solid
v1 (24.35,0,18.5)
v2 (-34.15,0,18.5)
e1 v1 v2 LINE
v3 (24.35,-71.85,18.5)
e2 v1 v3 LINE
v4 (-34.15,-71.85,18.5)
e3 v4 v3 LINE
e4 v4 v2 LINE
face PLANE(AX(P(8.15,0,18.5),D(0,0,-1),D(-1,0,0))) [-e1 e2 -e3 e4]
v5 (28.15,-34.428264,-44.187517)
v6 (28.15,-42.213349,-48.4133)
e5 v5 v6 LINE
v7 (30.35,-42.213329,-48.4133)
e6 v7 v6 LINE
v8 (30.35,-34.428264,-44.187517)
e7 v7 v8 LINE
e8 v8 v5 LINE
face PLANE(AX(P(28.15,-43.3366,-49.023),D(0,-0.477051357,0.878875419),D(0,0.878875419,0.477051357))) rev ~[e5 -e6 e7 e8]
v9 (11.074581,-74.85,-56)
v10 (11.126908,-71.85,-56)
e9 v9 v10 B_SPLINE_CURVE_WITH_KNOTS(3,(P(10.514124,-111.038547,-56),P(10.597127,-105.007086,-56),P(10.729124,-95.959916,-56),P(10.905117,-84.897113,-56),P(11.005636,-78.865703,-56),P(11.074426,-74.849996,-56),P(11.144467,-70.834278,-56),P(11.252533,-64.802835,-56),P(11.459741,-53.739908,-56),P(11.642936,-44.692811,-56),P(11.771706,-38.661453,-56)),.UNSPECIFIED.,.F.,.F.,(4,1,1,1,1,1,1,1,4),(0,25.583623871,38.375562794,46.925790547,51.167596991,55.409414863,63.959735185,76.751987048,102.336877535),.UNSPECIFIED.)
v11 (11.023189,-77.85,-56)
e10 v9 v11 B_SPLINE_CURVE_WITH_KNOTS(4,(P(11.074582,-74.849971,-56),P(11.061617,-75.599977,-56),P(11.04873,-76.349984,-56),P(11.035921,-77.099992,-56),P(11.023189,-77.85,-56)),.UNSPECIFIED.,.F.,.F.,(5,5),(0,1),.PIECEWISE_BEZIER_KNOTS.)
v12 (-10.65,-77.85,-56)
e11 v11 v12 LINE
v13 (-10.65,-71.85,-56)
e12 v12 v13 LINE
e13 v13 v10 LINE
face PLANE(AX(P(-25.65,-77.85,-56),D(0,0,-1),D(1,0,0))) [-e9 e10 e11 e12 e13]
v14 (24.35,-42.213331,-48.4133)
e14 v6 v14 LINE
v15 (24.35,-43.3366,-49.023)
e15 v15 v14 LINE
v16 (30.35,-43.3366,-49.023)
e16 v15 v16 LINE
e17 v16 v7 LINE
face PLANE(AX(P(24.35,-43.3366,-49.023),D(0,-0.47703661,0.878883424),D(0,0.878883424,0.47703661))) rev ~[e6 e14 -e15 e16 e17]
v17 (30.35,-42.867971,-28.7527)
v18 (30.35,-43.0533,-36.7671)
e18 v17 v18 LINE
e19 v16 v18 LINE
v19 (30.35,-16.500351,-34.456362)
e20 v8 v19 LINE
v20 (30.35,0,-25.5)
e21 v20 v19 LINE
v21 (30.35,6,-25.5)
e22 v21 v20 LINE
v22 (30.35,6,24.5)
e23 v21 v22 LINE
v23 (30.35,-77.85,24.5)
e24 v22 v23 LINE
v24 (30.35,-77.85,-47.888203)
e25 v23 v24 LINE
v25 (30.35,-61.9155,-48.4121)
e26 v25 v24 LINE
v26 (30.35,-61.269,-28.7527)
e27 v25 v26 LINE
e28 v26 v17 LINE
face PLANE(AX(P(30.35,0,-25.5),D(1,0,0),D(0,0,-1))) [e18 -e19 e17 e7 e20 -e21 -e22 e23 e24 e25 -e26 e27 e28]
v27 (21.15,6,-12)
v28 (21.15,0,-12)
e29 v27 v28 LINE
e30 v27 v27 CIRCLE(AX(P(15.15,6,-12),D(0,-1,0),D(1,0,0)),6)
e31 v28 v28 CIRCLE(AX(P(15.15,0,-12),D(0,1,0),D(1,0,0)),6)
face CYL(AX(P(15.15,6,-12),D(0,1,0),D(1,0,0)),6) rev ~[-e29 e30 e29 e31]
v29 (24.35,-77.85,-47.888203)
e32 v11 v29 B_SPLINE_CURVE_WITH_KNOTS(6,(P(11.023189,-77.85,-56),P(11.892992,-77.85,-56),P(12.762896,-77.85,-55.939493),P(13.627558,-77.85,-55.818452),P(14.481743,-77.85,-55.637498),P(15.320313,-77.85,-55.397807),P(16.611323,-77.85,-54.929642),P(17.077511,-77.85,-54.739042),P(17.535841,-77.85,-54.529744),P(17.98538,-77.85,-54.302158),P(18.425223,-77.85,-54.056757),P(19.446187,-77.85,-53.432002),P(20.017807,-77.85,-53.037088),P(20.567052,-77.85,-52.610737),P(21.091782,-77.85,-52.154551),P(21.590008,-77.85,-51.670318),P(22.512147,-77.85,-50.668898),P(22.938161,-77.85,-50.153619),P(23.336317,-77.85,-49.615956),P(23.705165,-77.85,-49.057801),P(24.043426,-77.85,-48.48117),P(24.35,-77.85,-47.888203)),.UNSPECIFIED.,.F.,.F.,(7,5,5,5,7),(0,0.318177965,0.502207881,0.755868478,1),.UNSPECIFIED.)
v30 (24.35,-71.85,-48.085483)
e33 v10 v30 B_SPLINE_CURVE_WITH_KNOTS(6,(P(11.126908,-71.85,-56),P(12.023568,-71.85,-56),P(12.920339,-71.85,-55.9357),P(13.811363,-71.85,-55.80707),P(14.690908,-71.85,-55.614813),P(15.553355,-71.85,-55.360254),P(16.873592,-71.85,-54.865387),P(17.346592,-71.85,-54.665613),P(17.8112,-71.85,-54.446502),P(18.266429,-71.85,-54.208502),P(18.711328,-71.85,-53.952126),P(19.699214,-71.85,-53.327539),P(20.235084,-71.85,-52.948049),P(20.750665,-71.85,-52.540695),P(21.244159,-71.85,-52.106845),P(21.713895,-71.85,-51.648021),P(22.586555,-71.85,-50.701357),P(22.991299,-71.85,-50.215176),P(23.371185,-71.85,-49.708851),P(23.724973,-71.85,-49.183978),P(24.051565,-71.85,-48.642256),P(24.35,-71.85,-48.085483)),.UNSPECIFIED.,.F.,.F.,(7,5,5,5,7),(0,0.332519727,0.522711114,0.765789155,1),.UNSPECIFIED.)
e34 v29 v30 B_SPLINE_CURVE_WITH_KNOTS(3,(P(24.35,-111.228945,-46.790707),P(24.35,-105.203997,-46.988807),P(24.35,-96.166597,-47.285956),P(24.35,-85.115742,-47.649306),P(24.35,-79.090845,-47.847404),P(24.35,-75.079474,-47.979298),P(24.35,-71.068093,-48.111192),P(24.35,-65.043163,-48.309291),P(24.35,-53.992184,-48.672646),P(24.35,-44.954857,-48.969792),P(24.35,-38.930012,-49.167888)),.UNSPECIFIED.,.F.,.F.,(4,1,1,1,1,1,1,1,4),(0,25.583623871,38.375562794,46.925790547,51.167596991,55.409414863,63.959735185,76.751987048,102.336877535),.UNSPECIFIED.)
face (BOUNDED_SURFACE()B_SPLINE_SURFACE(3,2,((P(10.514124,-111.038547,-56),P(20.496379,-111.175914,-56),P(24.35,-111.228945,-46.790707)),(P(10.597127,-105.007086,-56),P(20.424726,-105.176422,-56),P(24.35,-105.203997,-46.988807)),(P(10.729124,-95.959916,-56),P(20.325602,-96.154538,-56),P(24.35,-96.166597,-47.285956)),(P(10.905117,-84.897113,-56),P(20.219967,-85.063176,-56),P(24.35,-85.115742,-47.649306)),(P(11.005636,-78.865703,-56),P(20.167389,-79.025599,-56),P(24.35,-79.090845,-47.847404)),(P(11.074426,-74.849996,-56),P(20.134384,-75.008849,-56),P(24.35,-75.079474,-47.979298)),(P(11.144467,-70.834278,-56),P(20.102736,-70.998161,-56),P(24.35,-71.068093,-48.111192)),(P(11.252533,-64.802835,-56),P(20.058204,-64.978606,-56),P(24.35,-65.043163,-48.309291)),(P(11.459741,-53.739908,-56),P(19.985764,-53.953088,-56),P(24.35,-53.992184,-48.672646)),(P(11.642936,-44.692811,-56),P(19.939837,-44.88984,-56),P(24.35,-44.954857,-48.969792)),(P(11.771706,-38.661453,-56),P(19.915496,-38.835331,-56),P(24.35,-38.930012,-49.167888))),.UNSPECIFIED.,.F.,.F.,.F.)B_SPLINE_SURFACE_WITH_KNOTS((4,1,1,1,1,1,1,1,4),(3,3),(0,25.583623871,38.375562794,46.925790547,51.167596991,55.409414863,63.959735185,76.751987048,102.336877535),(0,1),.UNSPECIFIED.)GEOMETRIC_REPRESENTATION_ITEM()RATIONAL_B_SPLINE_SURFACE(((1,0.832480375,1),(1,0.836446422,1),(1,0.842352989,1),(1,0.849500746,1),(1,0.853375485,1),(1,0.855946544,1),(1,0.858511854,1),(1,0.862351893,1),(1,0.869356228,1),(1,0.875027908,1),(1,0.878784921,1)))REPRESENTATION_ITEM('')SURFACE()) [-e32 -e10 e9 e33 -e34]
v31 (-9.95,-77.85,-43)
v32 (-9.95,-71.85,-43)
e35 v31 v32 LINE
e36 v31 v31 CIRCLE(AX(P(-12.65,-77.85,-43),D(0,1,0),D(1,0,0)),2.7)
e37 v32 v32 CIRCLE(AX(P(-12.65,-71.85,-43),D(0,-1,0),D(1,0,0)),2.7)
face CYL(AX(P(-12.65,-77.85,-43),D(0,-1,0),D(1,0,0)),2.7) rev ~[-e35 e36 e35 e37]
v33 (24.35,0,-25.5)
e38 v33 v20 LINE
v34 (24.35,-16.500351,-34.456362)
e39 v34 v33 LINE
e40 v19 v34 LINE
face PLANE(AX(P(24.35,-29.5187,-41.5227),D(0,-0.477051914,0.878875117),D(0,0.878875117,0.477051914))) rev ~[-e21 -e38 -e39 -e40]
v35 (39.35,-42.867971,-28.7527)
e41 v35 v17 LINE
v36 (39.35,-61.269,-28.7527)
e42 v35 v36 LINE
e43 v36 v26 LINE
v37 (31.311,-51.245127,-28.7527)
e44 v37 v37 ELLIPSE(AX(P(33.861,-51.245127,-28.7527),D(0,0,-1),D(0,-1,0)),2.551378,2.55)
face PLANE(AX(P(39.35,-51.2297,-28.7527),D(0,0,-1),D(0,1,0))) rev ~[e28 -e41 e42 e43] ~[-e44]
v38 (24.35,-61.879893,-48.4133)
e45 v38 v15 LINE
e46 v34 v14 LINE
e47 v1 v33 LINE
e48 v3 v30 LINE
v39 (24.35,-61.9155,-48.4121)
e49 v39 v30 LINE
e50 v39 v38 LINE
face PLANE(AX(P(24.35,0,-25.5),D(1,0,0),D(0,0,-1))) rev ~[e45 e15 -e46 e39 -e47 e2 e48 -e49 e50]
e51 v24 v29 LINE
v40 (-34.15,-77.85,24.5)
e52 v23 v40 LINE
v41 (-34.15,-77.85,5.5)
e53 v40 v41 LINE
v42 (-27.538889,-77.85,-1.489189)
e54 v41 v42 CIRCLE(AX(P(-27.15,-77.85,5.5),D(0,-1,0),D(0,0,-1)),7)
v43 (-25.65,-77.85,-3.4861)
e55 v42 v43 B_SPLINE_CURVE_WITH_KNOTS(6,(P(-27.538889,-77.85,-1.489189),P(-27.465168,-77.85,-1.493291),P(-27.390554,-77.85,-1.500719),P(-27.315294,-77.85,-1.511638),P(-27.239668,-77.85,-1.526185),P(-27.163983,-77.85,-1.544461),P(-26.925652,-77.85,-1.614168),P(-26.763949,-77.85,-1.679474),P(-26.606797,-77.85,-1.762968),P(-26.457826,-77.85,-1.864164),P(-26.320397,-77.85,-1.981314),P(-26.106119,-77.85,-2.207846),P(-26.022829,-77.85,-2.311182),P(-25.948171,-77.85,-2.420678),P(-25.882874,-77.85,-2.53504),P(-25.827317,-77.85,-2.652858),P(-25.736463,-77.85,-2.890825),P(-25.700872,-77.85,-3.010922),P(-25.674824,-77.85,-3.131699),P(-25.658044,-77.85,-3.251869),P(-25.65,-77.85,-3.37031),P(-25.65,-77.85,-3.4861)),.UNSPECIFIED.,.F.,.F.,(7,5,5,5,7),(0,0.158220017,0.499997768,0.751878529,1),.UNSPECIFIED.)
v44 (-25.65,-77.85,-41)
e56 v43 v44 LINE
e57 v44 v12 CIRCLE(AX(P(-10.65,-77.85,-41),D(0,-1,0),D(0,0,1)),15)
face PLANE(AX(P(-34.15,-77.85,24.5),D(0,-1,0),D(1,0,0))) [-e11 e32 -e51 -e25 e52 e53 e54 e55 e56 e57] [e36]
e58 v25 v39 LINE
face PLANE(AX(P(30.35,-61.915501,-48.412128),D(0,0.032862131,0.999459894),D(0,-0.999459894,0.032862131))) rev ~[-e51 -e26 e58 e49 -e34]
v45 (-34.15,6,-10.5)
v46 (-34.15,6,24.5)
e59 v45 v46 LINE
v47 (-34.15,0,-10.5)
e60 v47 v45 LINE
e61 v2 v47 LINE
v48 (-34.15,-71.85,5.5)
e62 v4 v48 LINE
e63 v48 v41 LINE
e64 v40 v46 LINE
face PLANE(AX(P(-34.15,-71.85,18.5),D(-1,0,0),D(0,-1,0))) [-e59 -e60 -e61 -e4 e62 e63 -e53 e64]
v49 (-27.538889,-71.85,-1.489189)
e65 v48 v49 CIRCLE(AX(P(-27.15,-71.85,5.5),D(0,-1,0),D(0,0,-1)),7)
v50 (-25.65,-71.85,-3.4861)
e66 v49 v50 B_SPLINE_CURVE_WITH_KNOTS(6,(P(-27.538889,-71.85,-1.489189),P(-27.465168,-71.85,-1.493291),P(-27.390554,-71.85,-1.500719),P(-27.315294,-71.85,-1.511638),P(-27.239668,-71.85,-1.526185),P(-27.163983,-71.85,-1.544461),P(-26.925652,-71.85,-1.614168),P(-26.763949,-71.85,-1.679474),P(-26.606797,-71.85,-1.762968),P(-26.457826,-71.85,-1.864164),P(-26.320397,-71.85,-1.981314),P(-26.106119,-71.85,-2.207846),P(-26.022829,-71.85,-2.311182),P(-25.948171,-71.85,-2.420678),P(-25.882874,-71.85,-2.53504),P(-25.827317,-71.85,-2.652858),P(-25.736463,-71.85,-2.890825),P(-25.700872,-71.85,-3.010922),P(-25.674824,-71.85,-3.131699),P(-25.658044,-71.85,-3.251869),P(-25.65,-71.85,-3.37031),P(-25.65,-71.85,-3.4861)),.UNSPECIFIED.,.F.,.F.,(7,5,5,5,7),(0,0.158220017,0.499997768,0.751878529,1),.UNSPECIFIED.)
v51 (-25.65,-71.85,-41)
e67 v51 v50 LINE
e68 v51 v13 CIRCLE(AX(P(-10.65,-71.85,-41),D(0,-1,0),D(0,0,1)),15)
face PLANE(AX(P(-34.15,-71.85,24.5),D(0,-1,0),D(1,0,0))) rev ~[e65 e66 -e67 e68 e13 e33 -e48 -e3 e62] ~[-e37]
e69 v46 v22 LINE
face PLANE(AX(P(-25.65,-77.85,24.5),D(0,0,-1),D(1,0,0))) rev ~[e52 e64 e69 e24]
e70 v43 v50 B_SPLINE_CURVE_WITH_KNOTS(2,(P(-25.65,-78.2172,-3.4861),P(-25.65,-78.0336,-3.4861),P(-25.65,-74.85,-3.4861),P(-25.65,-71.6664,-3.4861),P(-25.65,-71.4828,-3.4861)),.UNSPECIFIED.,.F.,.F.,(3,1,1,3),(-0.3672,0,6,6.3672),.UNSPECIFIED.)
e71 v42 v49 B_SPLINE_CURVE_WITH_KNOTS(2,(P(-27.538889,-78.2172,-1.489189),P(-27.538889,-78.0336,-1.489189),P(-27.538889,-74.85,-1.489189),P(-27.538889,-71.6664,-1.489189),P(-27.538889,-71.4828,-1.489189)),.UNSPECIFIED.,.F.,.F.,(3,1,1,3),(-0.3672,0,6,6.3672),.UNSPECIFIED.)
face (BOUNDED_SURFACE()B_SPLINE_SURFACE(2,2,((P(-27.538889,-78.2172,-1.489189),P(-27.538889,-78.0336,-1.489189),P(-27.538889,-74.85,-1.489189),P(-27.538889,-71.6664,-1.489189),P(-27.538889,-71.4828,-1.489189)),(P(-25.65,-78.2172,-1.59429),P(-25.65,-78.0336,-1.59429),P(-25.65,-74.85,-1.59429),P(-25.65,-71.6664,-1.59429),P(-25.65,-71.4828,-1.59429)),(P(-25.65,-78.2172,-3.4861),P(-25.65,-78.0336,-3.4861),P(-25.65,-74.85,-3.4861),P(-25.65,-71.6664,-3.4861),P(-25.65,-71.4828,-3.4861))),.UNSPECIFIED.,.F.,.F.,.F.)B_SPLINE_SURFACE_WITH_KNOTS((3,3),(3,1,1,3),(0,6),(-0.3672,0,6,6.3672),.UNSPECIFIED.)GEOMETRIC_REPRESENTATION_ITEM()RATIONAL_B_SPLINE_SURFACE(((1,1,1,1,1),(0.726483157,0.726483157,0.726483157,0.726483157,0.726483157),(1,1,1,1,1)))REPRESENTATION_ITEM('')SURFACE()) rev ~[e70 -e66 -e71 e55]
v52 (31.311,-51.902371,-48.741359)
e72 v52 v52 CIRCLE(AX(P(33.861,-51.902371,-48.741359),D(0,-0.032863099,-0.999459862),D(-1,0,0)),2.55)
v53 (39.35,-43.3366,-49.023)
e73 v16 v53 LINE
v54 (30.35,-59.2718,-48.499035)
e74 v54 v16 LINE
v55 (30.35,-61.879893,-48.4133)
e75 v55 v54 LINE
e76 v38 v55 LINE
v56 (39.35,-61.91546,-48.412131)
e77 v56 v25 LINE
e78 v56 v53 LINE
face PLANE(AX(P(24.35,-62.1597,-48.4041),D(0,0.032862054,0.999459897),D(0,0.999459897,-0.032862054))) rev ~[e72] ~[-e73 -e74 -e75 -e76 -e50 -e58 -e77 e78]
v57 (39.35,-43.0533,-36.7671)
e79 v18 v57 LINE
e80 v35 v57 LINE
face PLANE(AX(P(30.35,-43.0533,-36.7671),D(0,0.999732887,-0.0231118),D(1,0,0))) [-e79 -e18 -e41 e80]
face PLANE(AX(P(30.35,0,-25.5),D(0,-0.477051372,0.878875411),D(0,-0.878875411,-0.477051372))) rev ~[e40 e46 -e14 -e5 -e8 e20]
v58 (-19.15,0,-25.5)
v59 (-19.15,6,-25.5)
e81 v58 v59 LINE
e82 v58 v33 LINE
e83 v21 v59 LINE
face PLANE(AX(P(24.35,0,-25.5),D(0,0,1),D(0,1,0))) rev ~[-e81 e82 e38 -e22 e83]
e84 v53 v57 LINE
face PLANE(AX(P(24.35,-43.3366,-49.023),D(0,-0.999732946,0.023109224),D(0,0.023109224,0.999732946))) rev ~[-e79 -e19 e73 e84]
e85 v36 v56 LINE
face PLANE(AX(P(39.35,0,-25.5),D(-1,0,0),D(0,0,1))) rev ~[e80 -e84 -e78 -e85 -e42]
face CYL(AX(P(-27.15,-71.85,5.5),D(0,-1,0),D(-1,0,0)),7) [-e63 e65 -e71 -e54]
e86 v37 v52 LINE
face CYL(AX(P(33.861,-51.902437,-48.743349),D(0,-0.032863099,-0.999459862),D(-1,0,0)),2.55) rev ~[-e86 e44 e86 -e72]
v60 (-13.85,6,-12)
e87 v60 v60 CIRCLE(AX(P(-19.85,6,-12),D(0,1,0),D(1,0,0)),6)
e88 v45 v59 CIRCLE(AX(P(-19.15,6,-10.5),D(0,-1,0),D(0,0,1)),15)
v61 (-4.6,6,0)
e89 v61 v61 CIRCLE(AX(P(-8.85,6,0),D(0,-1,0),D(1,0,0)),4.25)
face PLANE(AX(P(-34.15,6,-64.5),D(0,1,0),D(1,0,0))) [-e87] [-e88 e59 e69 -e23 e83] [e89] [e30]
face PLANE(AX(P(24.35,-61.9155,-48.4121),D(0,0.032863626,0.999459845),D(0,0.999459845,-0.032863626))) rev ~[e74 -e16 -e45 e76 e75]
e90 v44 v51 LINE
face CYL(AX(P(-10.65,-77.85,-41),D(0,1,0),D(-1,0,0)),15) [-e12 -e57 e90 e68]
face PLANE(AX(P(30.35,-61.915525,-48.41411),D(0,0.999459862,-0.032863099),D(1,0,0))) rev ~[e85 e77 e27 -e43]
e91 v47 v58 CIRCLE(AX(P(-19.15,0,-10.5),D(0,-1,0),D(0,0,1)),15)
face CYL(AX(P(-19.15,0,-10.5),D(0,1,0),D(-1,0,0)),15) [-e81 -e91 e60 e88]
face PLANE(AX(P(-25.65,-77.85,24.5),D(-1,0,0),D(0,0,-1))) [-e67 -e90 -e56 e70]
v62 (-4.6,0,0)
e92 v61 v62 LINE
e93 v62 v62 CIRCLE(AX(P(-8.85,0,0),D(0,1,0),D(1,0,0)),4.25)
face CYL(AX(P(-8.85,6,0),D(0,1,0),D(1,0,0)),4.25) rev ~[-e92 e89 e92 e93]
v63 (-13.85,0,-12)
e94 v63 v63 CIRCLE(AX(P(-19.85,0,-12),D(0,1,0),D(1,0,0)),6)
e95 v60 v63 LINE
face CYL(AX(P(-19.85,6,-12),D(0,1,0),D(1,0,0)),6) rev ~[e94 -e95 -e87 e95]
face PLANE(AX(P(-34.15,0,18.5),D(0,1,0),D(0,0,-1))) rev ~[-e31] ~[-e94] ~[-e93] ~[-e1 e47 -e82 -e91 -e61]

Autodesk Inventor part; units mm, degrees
ref_plane "YZ Plane" through (0, 0, 0) normal (1, 0, 0) x (0, 1, 0)
ref_plane "XZ Plane" through (0, 0, 0) normal (0, 1, 0) x (-1, 0, 0)
ref_plane "XY Plane" through (0, 0, 0) normal (0, 0, 1) x (1, 0, 0)
sketch "Sketch1" plane through (0, 0, 0) normal (0, 1, 0) x (-1, 0, 0)
  line L0 (0, -25.5) -> (-34.15, -25.5)
  line L1 (-34.15, -25.5) -> (-34.15, 0)
  line L2 (-34.15, 0) -> (-34.15, 25.5)
  line L3 (-34.15, 25.5) -> (0, 25.5)
  line L4 (0, 25.5) -> (34.15, 25.5)
  line L5 (34.15, 25.5) -> (34.15, 0)
  line L6 (34.15, 0) -> (34.15, -25.5)
  line L7 (34.15, -25.5) -> (0, -25.5)
  point P0 (0, 0)
extrude "Extrusion1" add sketch "Sketch1" along normal blind 7
sketch "Sketch4" plane through (-34.15, 0, -25.5) normal (-1, 0, 0) x (0, 0, 1)
  line L0 (51, 0) -> (51, -78.85)
  line L1 (51, -78.85) -> (-39, -78.85)
  line L2 (-39, -78.85) -> (-39, -71.85)
  line L3 (0, 0) -> (-39, -71.85)
  line L4 (0, 0) -> (51, 0)
  point P0 (25.5, 0)
  dimension "d10" = 90
  dimension "d11" = 7
extrude "Extrusion2" add sketch "Sketch4" against normal blind 7
sketch "Sketch7" plane through (-27.15, 0, -25.5) normal (1, 0, 0) x (0, 0, -1)
  line L0 (-51, -78.85) -> (39, -78.85) projected
  line L1 (-51, -78.85) -> (39, -78.85)
  line L2 (39, -78.85) -> (39, -71.85) projected
  line L3 (39, -78.85) -> (39, -71.85)
  line L4 (39, -71.85) -> (-51, -71.85)
  line L5 (-51, 0) -> (-51, -78.85) projected
  line L6 (-51, -78.85) -> (-51, -71.85)
  point P0 (-25.5, 0)
sketch "Sketch8" plane through (0, 0, 0) normal (0, -1, 0) x (1, 0, 0)
  circle A0 centre (8.15, 0) radius 5 projected
  line L0 (8.15, 18.5) -> (34.15, 18.5)
  line L1 (34.15, 25.5) -> (34.15, -25.5) projected
  line L2 (8.15, 25.5) -> (34.15, 25.5)
  line L3 (8.15, 25.5) -> (-27.15, 25.5)
  line L4 (-27.15, 25.5) -> (-27.15, -25.5) projected
  line L5 (8.15, 18.5) -> (-27.15, 18.5)
  line L6 (34.15, 25.5) -> (34.15, 18.5)
  line L7 (-27.15, 25.5) -> (-27.15, 18.5)
  point P0 (0, 0)
extrude "Extrusion6" add sketch "Sketch7" along normal blind 58.5
extrude "Extrusion7" add sketch "Sketch8" along normal blind 78.75 contours L5 L4 L3 L2 L1 L0
sketch "Sketch9" plane through (31.35, 0, -25.5) normal (1, 0, 0) x (0, 0, -1)
  line L0 (-51, -78.75) -> (-51, 7) projected
  line L1 (-44, 0) -> (-44, -71.85) projected
  line L2 (-51, -78.75) -> (-44, -78.75)
  line L3 (-44, -78.75) -> (-44, -71.85)
  line L4 (-44, -71.85) -> (-51, -71.85)
  line L5 (-51, -71.85) -> (-51, -78.75)
  point P0 (-25.5, 0)
extrude "Extrusion8" cut sketch "Sketch9" along normal blind 10
sketch "Boceto11" plane through (-34.15, -78.85, -64.5) normal (0, -1, 0) x (1, 0, 0)
  line L0 (0, 0) -> (65.5, 0) projected
  line L1 (65.5, 89.9985) -> (65.5, 0)
  line L2 (65.5, 0) -> (71.065, 0)
  line L3 (71.065, 0) -> (71.065, 89.9985)
  line L4 (71.065, 89.9985) -> (65.5, 89.9985)
  line L5 (65.5, 89.9985) -> (65.5, 95.8996)
  line L6 (65.5, 95.8996) -> (71.065, 89.9985)
  point P0 (34.15, 64.5)
extrude "Extrusión9" cut sketch "Boceto11" against normal blind 100
sketch "Boceto12" plane through (31.35, 0, -25.5) normal (1, 0, 0) x (0, 0, -1)
  line L0 (-44, 0) -> (-44, -71.85) projected
  line L1 (-44, 0) -> (-44, -71.85)
  line L2 (39, -71.85) -> (39, -78.85) projected
  line L3 (-44, -71.85) -> (39, -71.85)
  line L4 (-44, 0) -> (0, 0) projected
  line L5 (39, -71.85) -> (0, 0)
  line L6 (0, 0) -> (-44, 0)
  point P0 (-25.5, 0)
extrude "Extrusión10" add sketch "Boceto12" against normal blind 7
sketch "Boceto13" plane through (-34.15, 7, -25.5) normal (-1, 0, 0) x (0, 0, 1)
  line L0 (0, -7) -> (0, 0) projected
  line L1 (44, -7) -> (0, -7) projected
  line L2 (0, -7) -> (44, -7)
  line L3 (44, -78.85) -> (-39, -78.85) projected
  line L4 (44, -7) -> (44, -78.85)
  line L5 (44, -78.85) -> (-39, -78.85)
  line L6 (-39, -78.85) -> (0, -7)
  point P0 (25.5, -7)
extrude "Extrusión11" cut sketch "Boceto13" against normal blind 7
sketch "Boceto19" plane through (-34.15, -78.85, -64.5) normal (0, -1, 0) x (1, 0, 0)
  line L0 (65.5, 90) -> (65.5, 0) projected
  line L1 (65.5, 0) -> (65.5, 40.9323)
  line L2 (81.7334, 40.9323) -> (65.5, 40.9323)
  line L3 (81.7334, 40.9323) -> (81.7334, 0)
  line L4 (81.7334, 0) -> (65.5, 0)
  point P0 (34.15, 64.5)
extrude "Extrusión17" cut sketch "Boceto19" against normal blind 100
sketch "Boceto20" plane through (24.35, 0, -25.5) normal (-1, 0, 0) x (0, 0, 1)
  line L0 (-29.1839, -53.7657) -> (-27.9516, -53.3206) projected
  line L1 (0, 0) -> (-39, -71.85) projected
  line L2 (-29.1839, -53.7657) -> (-27.8697, -51.3447)
  line L3 (-27.8697, -51.3447) -> (-27.9516, -53.3206) projected
  line L4 (-27.8697, -51.3447) -> (-27.9516, -53.3206)
  line L5 (-27.9516, -53.3206) -> (-29.1839, -53.7657)
  point P0 (25.5, 0)
extrude "Extrusión18" add sketch "Boceto20" against normal blind 7
sketch "Boceto27" plane through (31.35, 0, -25.5) normal (1, 0, 0) x (0, 0, -1)
  line L0 (-51, 7) -> (0, 7) projected
  line L1 (0, 7) -> (16.0227, 7)
  line L2 (16.0227, 7) -> (16.0227, -29.5187)
  line L3 (0, 0) -> (39, -71.85) projected
  line L4 (16.0227, -29.5187) -> (0, 0)
  line L5 (0, 0) -> (0, 7)
  point P0 (-25.5, 0)
extrude "Extrusión22" add sketch "Boceto27" against normal blind 7
sketch "Boceto28" plane through (24.35, 0, -25.5) normal (-1, 0, 0) x (0, 0, 1)
  line L0 (-16.0227, -29.5187) -> (-39, -71.85) projected
  line L1 (-16.0227, -29.5187) -> (0, 0)
  line L2 (0, 7) -> (-16.0227, 7) projected
  line L3 (0, 0) -> (0, 7)
  line L4 (0, 7) -> (-16.0227, 7)
  line L5 (-16.0227, 7) -> (-16.0227, -29.5187) projected
  line L6 (-16.0227, 7) -> (-16.0227, -29.5187)
  point P0 (25.5, 0)
extrude "Extrusión23" cut sketch "Boceto28" against normal blind 7
sketch "Boceto31" plane through (-34.15, -78.85, -64.5) normal (0, 0, -1) x (-1, 0, 0)
  line L0 (0, 7) -> (0, 0) projected
  line L1 (0, 0) -> (0, 1)
  line L2 (0, 1) -> (-65.5, 1)
  line L3 (-65.5, 0) -> (-65.5, 85.85) projected
  line L4 (-65.5, 1) -> (-64.5, 1)
  line L5 (-64.5, 1) -> (-64.5, 85.85)
  line L6 (0, 85.85) -> (-65.5, 85.85) projected
  line L7 (-64.5, 85.85) -> (0, 85.85)
  line L8 (0, 85.85) -> (0, 84.85)
  line L9 (0, 0) -> (0, 85.85) projected
  line L10 (0, 84.85) -> (-64.5, 84.85)
  line L11 (-64.5, 85.85) -> (-65.5, 85.85)
  line L12 (0, 0) -> (-65.5, 0) projected
  line L13 (-65.5, 85.85) -> (-65.5, 0)
  line L14 (-65.5, 0) -> (0, 0)
  point P0 (-34.15, 78.85)
  dimension "d84" = 1
  dimension "d85" = 1
  dimension "d86" = 1
extrude "Extrusión26" cut sketch "Boceto31" against normal blind 1000 contours L0 L12 L3 L2 | L10 L5 L6 L8 | L2 L3 L6 L5
sketch "Boceto32" plane through (-34.15, -71.85, 18.5) normal (-1, 0, 0) x (0, 0, 1)
  line L0 (-83, -6) -> (7, -6) projected
  line L1 (7, -6) -> (6, -6)
  line L2 (6, -6) -> (6, 77.85)
  line L3 (7, 77.85) -> (-44, 77.85) projected
  line L4 (7, -6) -> (7, 77.85) projected
  line L5 (6, 77.85) -> (7, 77.85)
  line L6 (7, 77.85) -> (7, -6)
  point P0 (-18.5, 71.85)
  dimension "d89" = 1
extrude "Extrusión27" cut sketch "Boceto32" against normal blind 100
sketch "Boceto33" plane through (-34.15, 6, -25.5) normal (0, 1, 0) x (1, 0, 0)
  line L0 (0, 0) -> (0, -44) projected
  line L1 (0, 0) -> (0, -25.5)
  line L2 (0, -25.5) -> (25.3, -25.5)
  circle A0 centre (25.3, -25.5) radius 4.25
  point P0 (34.15, -25.5)
  dimension "d92" = 25.5
  dimension "d93" = 25.3
  dimension "d94" = 8.5
extrude "Extrusión28" cut sketch "Boceto33" against normal blind 10
sketch "Boceto35" plane through (30.35, -77.85, -64.5) normal (1, 0, 0) x (0, 0, -1)
  circle A0 centre (-24.4828, 41.285) radius 2.6
  point P0 (-64.5, 77.85)
  dimension "d101" = 5.2
extrude "Extrusión29" cut sketch "Boceto35" against normal blind 10
sketch "Boceto37" plane through (30.35, -77.85, -64.5) normal (1, 0, 0) x (0, 0, -1)
  line L0 (-39, 77.85) -> (0, 6) projected
  line L1 (-12.3437, 28.741) -> (-12.3437, 48.1268)
  line L2 (-12.3437, 48.1268) -> (-28.4038, 58.3285)
  line L3 (-12.3437, 28.741) -> (-28.4038, 58.3285)
  point P0 (-64.5, 77.85)
extrude "Extrusión30" add sketch "Boceto37" against normal blind 6
fillet "Empalme3" radius 10 3 edges at (27.35, -29.7232, -52.1563) (27.35, -49.109, -52.1563) (27.35, -19.5215, -36.0962)
sketch "Boceto39" plane through (30.35, -77.85, -64.5) normal (1, 0, 0) x (0, 0, -1)
  line L0 (-6.8274, 18.5782) -> (-18.8698, 18.5782)
  line L1 (-18.8698, 18.5782) -> (-18.2969, 35.7502)
  line L2 (-18.2969, 35.7502) -> (-20.685, 39.2299)
  line L3 (-20.685, 39.2299) -> (-19.4909, 52.6668)
  line L4 (-26.2143, 56.9377) -> (-16.9818, 51.073) projected
  line L5 (-6.8274, 18.5782) -> (-5.5662, 48.0514)
  line L6 (-5.5662, 48.0514) -> (-19.4909, 52.6668)
  point P0 (-64.5, 77.85)
extrude "Extrusión31" cut sketch "Boceto39" against normal blind 2.2
fillet "Empalme4" radius 10 1 edges at (29.25, -25.1832, -45.0091)
sketch "Boceto40" plane through (24.35, 0, -25.5) normal (-1, 0, 0) x (0, 0, 1)
  line L0 (-26.6563, -35.218) -> (-26.6563, -46.57) projected
  line L1 (-26.6563, -35.218) -> (-24.0221, -30.4862) construction
  arc A0 (-12.7857, -20.9123) -> (-9.3588, -17.2419) centre (-18.1476, -12.4713) ccw projected
  line L2 (-24.0221, -30.4862) -> (-10.7107, -19.1566) construction
  spline S0 degree 2 poles (-26.6563, -35.218) (-24.0221, -30.4862) (-10.7107, -19.1566) knots 1 1 1 2 2 2
  line L3 (-26.6563, -35.218) -> (-10.7107, -35.218)
  line L4 (-10.7107, -35.218) -> (-10.7107, -19.1566)
  line L5 (-10.7107, -19.1566) -> (-26.6563, -19.1566)
  line L6 (-26.6563, -19.1566) -> (-26.6563, -35.218)
  point P0 (25.5, 0)
  point P1 (-10.7107, -19.1566)
extrude "Extrusión32" cut sketch "Boceto40" against normal blind 6 contours S0 L6 L5
fillet "Empalme5" radius 10 1 edges at (26.25, -35.218, -52.1563)
sketch "Boceto41" plane through (-34.15, -71.85, 18.5) normal (0, 1, 0) x (1, 0, 0)
  circle A0 centre (11.5, 71.5) radius 5 projected
  circle A1 centre (11.5, 71.5) radius 6
  line L0 (11.5, 71.5) -> (-12.5, 71.5)
  line L1 (-12.5, 71.5) -> (-12.5, 95.5)
  line L2 (-12.5, 95.5) -> (11.5, 95.5)
  line L3 (11.5, 95.5) -> (11.5, 71.5)
  line L4 (64.5, 76.1726) -> (64.5, 83) projected
  line L5 (64.5, 83) -> (64.5, 95.5)
  line L6 (64.5, 95.5) -> (11.5, 95.5)
  line L7 (0, 83) -> (0, -6) projected
  line L8 (0, -6) -> (-12.5, -6)
  line L9 (-12.5, -6) -> (-12.5, 71.5)
  line L10 (64.5, 83) -> (11.5, 83)
  line L11 (0, 83) -> (58.5, 83) projected
  point P0 (34.15, 18.5)
  dimension "d113" = 12
  dimension "d114" = 24
  dimension "d115" = 24
extrude "Extrusión33" add sketch "Boceto41" against normal blind 6 contours L11 L7 L0 L1 L2 L3 | L3 L6 L5 L10 | L7 L8 L9 L0
sketch "Boceto43" plane through (30.35, 6, 24.5) normal (0, 1, 0) x (1, 0, 0)
  circle A0 centre (-39.2, 24.5) radius 4.25 projected
  circle A1 centre (-15.2, 36.5) radius 6
  circle A2 centre (-50.2, 36.5) radius 6
  line L0 (-15.2, 36.5) -> (-50.2, 36.5)
  point P0 (-30.35, 24.5)
  dimension "d126" = 12
  dimension "d127" = 12
  dimension "d240" = 35
extrude "Extrusión35" cut sketch "Boceto43" against normal blind 6 contours A1 | A2
sketch "Boceto44" plane through (24.35, 0, -25.5) normal (-1, 0, 0) x (0, 0, 1)
  line L0 (0, 0) -> (-9.3588, -17.2419) projected
  line L1 (-9.3588, -17.2419) -> (-30.5215, -33.5874)
  line L2 (-30.5215, -33.5874) -> (-30.5215, -56.2301)
  line L3 (-27.8675, -51.3405) -> (-39, -71.85) projected
  arc A0 (-12.666, -20.8351) -> (-9.3588, -17.2419) centre (-18.1476, -12.4713) ccw projected
  line L4 (-30.5215, -56.2301) -> (-9.3588, -17.2419)
  point P0 (25.5, 0)
extrude "Extrusión36" add sketch "Boceto44" against normal blind 6
sketch "Boceto45" plane through (30.35, 0, -25.5) normal (1, 0, 0) x (0, 0, -1)
  line L0 (18.315, -38.6201) -> (18.6875, -34.4282) projected
  line L1 (18.6875, -34.4282) -> (19.9402, -25.4146)
  line L2 (9.3588, -17.2419) -> (30.5215, -33.5874) projected
  line L3 (30.5215, -56.2301) -> (30.5215, -33.5874) projected
  line L4 (19.9402, -25.4146) -> (30.5215, -33.5874)
  line L5 (30.5215, -33.5874) -> (32.1519, -59.2336)
  line L6 (30.5215, -56.2301) -> (39, -71.85) projected
  line L7 (32.1726, -59.2718) -> (20.1302, -59.2718) projected
  line L8 (32.1726, -59.2718) -> (18.315, -38.6201)
  point P0 (-25.5, 0)
extrude "Extrusión37" cut sketch "Boceto45" against normal blind 2.2 contours L0 L1 L2 L3 L6 L8
fillet "Empalme7" radius 4 3 edges at (26.25, -33.5874, -56.0215) (27.35, -17.2419, -34.8588) (26.25, -56.2301, -56.0215)
sketch "Boceto46" plane through (-34.15, -71.85, 18.5) normal (0, 1, 0) x (1, 0, 0)
  line L0 (-12.5, -6) -> (0, -6) projected
  line L1 (0, -6) -> (0, 95.5)
  line L2 (-12.5, 95.5) -> (64.5, 95.5) projected
  line L3 (0, 95.5) -> (-12.5, 95.5)
  line L4 (-12.5, 95.5) -> (-12.5, -6)
  line L5 (-12.5, -6) -> (0, -6)
  point P0 (34.15, 18.5)
extrude "Extrusión38" cut sketch "Boceto46" against normal blind 10
sketch "Sketch48" plane through (-34.15, -71.85, 18.5) normal (0, 1, 0) x (1, 0, 0)
  circle A0 centre (26.5, 69) radius 6 projected
  line L0 (29.7126, 74.0675) -> (26.5, 69)
  circle A1 centre (26.5, 69) radius 18
  line L1 (8.5, 69) -> (8.5, 0)
  line L2 (0, 0) -> (58.5, 0) projected
  line L3 (0, 0) -> (8.5, 0)
  line L4 (26.5, 87) -> (64.5, 87)
  line L5 (64.5, 83) -> (64.5, 95.5) projected
  line L6 (0, 0) -> (0, -6) projected
  line L7 (64.5, 95.5) -> (0, 95.5)
  line L8 (0, 95.5) -> (0, 0)
  point P0 (34.15, 18.5)
  dimension "d142" = 36
extrude "Extrusion40" cut sketch "Sketch48" against normal blind 10 contours A1 L1 L2 L8 L7 L5 L4
sketch "Sketch49" plane through (24.35, 0, 18.5) normal (0, 0, -1) x (-1, 0, 0)
  line L0 (58.5, -77.85) -> (50, -77.85) projected
  line L1 (58.5, -77.85) -> (50, -77.85)
  line L2 (50, -71.85) -> (0, -71.85) projected
  line L3 (50, -77.85) -> (50, -71.85)
  line L4 (50, -71.85) -> (58.5, -71.85)
  line L5 (58.5, -71.85) -> (58.5, -77.85)
  point P0 (24.35, 0)
extrude "Extrusion41" add sketch "Sketch49" along normal blind 20
fillet "Fillet8" radius 7 1 edges at (-34.15, -74.85, -1.5)
fillet "Fillet9" radius 2 1 edges at (-25.65, -74.85, -1.5)
sketch "Sketch52" plane through (30.35, 0, -25.5) normal (1, 0, 0) x (0, 0, -1)
  line L0 (0, 0) -> (-44, 0) projected
  line L1 (32.1726, -59.2718) -> (39, -71.85) projected
  line L2 (0, 0) -> (39, -71.85)
  line L3 (22.9041, -62.1597) -> (23.523, -43.3366)
  line L4 (22.9041, -62.1597) -> (39, -71.85)
  line L5 (39, -71.85) -> (32.1726, -12.8018)
  line L6 (0, 0) -> (0, 6) projected
  line L7 (32.1726, -12.8018) -> (0, 0)
  point P0 (-25.5, 0)
extrude "Extrusion42" cut sketch "Sketch52" against normal blind 10
sketch "Sketch53" plane through (28.15, -77.85, -64.5) normal (1, 0, 0) x (0, 0, -1)
  line L0 (-16.0959, 15.6903) -> (0, 6) projected
  line L1 (-16.001, 18.5782) -> (-15.477, 34.5134) projected
  line L2 (-16.0959, 15.6903) -> (-15.477, 34.5134)
  line L3 (-15.477, 34.5134) -> (-20.7531, 44.2336)
  line L4 (-39, 77.85) -> (-15.477, 34.5134) projected
  line L5 (-20.7531, 44.2336) -> (-21.8828, 18.4708)
  line L6 (-21.8828, 18.4708) -> (-16.0045, 18.4708)
  point P0 (-64.5, 77.85)
extrude "Extrusion43" add sketch "Sketch53" along normal blind 2.2
sketch "Sketch54" plane through (30.35, 0, -25.5) normal (1, 0, 0) x (0, 0, -1)
  circle A0 centre (14.5172, -36.565) radius 2.6 projected
  circle A1 centre (14.5172, -36.565) radius 2.6
  point P0 (-25.5, 0)
extrude "Extrusion44" add sketch "Sketch54" against normal blind 6
sketch "Sketch56" plane through (24.35, 0, -25.5) normal (-1, 0, 0) x (0, 0, 1)
  line L0 (-22.9041, -62.1597) -> (-23.523, -43.3366) projected
  line L1 (-23.523, -43.3366) -> (-22.9041, -62.1597)
  line L2 (-22.9041, -62.1597) -> (-10.8346, -61.7628)
  line L3 (-10.8346, -61.7628) -> (-11.7615, -21.6683)
  line L4 (0, 0) -> (-23.523, -43.3366) projected
  line L5 (-23.523, -43.3366) -> (-11.2671, -43.0533)
  line L6 (-23.523, -43.3366) -> (-22.9041, -62.1597)
  line L7 (-22.9041, -62.1597) -> (-10.8346, -61.7628)
  line L8 (-10.8346, -61.7628) -> (-11.2671, -43.0533)
  line L9 (-11.2671, -43.0533) -> (-23.523, -43.3366)
  point P0 (25.5, 0)
extrude "Extrusion45" add sketch "Sketch56" against normal blind 15 contours L0 L5 L3 L2
sketch "Sketch57" plane through (39.35, -43.3366, -49.023) normal (0, -0.0328631, -0.9994599) x (-1, 0, 0)
  line L0 (0.989, -8.5704) -> (9.989, -8.5704)
  line L1 (9, 46.8938) -> (9, -36.911) projected
  circle A0 centre (5.489, -8.5704) radius 2.55
  line L2 (5.489, -8.5704) -> (0.989, -8.5704)
  line L3 (5.489, -8.5704) -> (-0.011, -8.5704)
  point P0 (39.35, 41.7021)
  dimension "d218" = 5.5
  dimension "d219" = 5.1
extrude "Extrusion46" cut sketch "Sketch57" against normal blind 20
sketch "Sketch59" plane through (30.35, -43.0533, -36.7671) normal (0, 0.9997329, -0.0231118) x (1, 0, 0)
  line L0 (9, 0) -> (9, 12.0754) projected
  line L1 (0, 32.5286) -> (0, -60.4465) projected
  line L2 (9, 0) -> (0, 0)
  line L3 (0, 0) -> (0, -12.412)
  line L4 (0, -12.412) -> (9, -12.412)
  line L5 (9, -12.412) -> (9, 0)
  line L6 (0, -12.412) -> (0, -36.6315)
  line L7 (0, -36.6315) -> (9, -12.412)
  point P0 (-30.35, -37.7523)
extrude "Extrusion47" add sketch "Sketch59" against normal blind 18.7159
sketch "Sketch60" plane through (30.35, 0, -25.5) normal (1, 0, 0) x (0, 0, -1)
  line L0 (22.9041, -62.1597) -> (10.8346, -61.7628) projected
  line L1 (22.9041, -62.1597) -> (-35.3443, -60.8131)
  line L2 (10.8346, -61.7642) -> (-25.7871, -60.9175) projected
  line L3 (-35.3443, -60.8131) -> (-11.8971, -71.85)
  line L4 (-44, -71.85) -> (39, -71.85) projected
  line L5 (22.9041, -62.1597) -> (-11.8971, -71.85)
  point P0 (-25.5, 0)
extrude "Extrusion48" cut sketch "Sketch60" along normal blind 18.7159
sketch "Sketch62" plane through (39.35, -43.3366, -49.023) normal (0, -0.0328631, -0.9994599) x (-1, 0, 0)
  line L0 (9, -18.8333) -> (9, -18.8346) projected
  line L1 (9, -18.8346) -> (-1.0251, -18.8346)
  line L2 (-1.0251, -18.8346) -> (-1.0251, -24.5564)
  line L3 (-1.0251, -24.5564) -> (9, -24.5564)
  line L4 (9, -24.5564) -> (9, -18.8346)
  point P0 (39.35, 41.7021)
extrude "Extrusion49" cut sketch "Sketch62" against normal blind 100
sketch "Sketch63" plane through (39.35, -43.3366, -49.023) normal (0, -0.0328631, -0.9994599) x (-1, 0, 0)
  line L0 (9, 46.8938) -> (9, -36.911) projected
  line L1 (9, -18.5889) -> (-0.3497, -18.5889)
  line L2 (-0.3497, -18.5889) -> (-0.3497, -22.6635)
  line L3 (-0.3497, -22.6635) -> (9, -22.6635)
  line L4 (9, -22.6635) -> (9, -18.5889)
  point P0 (39.35, 41.7021)
  point P1 (9, -22.6635)
extrude "Extrusion50" cut sketch "Sketch63" against normal blind 100
sketch "Sketch64" plane through (-34.15, 6, -25.5) normal (0, 1, 0) x (1, 0, 0)
  line L0 (58.5, -44) -> (58.5, 39) projected
  line L1 (58.5, 23.5443) -> (58.5, 43.0724)
  line L2 (58.5, 43.0724) -> (64.7623, 43.0724)
  line L3 (64.7623, 43.0724) -> (64.7623, 23.523)
  line L4 (64.5, 23.523) -> (73.5, 23.523) projected
  line L5 (58.5, 23.523) -> (64.5, 23.523) projected
  line L6 (58.5, 23.523) -> (64.7623, 23.523)
  point P0 (34.15, -25.5)
extrude "Extrusion51" cut sketch "Sketch64" against normal blind 100
sketch "Sketch66" plane through (-34.15, -77.85, 24.5) normal (0, -1, 0) x (1, 0, 0)
  line L0 (64.5, -73.523) -> (64.5, 0) projected
  line L1 (64.5, -72.9133) -> (58.4721, -72.9133)
  line L2 (58.4721, -72.9133) -> (58.4721, -73.523)
  line L3 (58.4721, -73.523) -> (64.5, -73.523)
  line L4 (64.5, -73.523) -> (64.5, -72.9133)
  point P0 (34.15, -24.5)
extrude "Extrusion52" cut sketch "Sketch66" against normal blind 100
sketch "Sketch67" plane through (24.35, 0, -25.5) normal (-1, 0, 0) x (0, 0, 1)
  line L0 (-22.9121, -61.9155) -> (-23.523, -43.3366) projected
  line L1 (-22.9121, -61.9155) -> (-23.523, -43.3366)
  line L2 (-22.9133, -43.3225) -> (-22.9133, -42.2133) projected
  line L3 (-23.523, -43.3366) -> (-22.9133, -42.2133)
  line L4 (-22.9133, -42.2133) -> (-22.9121, -61.9155)
  point P0 (25.5, 0)
extrude "Extrusion53" add sketch "Sketch67" against normal blind 6
sketch "Sketch70" plane through (30.35, 0, -25.5) normal (1, 0, 0) x (0, 0, -1)
  line L0 (22.9121, -61.9155) -> (23.523, -43.3366) projected
  line L1 (23.523, -43.3366) -> (22.9041, -62.1597) projected
  line L2 (22.9121, -61.9155) -> (22.9041, -62.1597)
  line L3 (22.9041, -62.1597) -> (22.9133, -62.1652)
  line L4 (22.9133, -62.1652) -> (22.9121, -61.9155)
  point P0 (-25.5, 0)
  point P1 (22.9133, -77.85)
extrude "Extrusion54" add sketch "Sketch70" against normal blind 6
sketch "Sketch78" plane through (30.35, -77.85, -48.4133) normal (0, -1, 0) x (1, 0, 0)
  line L0 (-64.5, 72.9133) -> (-43, 72.9133)
  line L1 (-43, 72.9133) -> (-43, 5.4133)
  line L2 (-43, 5.4133) -> (-64.5, 5.4133)
  line L3 (-64.5, 5.4133) -> (-64.5, 72.9133)
  circle A0 centre (-43, 5.4133) radius 2.7
  point P0 (-30.35, 48.4133)
  dimension "d203" = 21.5
  dimension "d204" = 67.5
  dimension "d205" = 5.4
extrude "Extrusion62" cut sketch "Sketch78" against normal blind 10 contours A0 L2 L1 | L1 L2 A0
sketch "Sketch81" plane through (-34.15, -77.85, 24.5) normal (0, -1, 0) x (1, 0, 0)
  circle A0 centre (21.5, -67.5) radius 2.7 projected
  line L0 (21.5, -67.5) -> (21.5, -80.5)
  line L1 (21.5, -80.5) -> (58.5, -80.5)
  line L2 (58.5, -93) -> (58.5, -73.523) projected
  circle A1 centre (21.5, -67.5) radius 2.7
  line L3 (0, 0) -> (64.5, 0) projected
  line L4 (58.5, 0) -> (8.5, 0)
  line L5 (8.5, 0) -> (8.5, -80.5)
  line L6 (8.5, -80.5) -> (58.5, -80.5)
  line L7 (58.5, -80.5) -> (58.5, 0)
  line L8 (58.5, -80.5) -> (8.5, -80.5)
  line L9 (8.5, -80.5) -> (8.5, -99.9184)
  line L10 (8.5, -99.9184) -> (58.5, -99.9184)
  line L11 (58.5, -99.9184) -> (58.5, -80.5)
  point P0 (34.15, -24.5)
  point P1 (8.5, -80.5)
  point P2 (8.5, 0)
  dimension "d224" = 13
extrude "Extrusion67" cut sketch "Sketch81" against normal blind 10 contours L1 L2 L11 L10 L9 L6
extrude "Extrusion68" add sketch "Sketch81" against normal blind 6 contours L6 L5 L3 L7 L2 L1
sketch "Sketch83" plane through (39.35, 0, -25.5) normal (1, 0, 0) x (0, 0, -1)
  line L0 (0, 0) -> (23.523, -43.3366) projected
  line L1 (23.523, -43.3366) -> (23.2095, -52.8715)
  line L2 (23.523, -43.3366) -> (22.9121, -61.9155) projected
  line L3 (23.523, -43.3366) -> (23.2419, -51.887)
  line L4 (23.2419, -51.887) -> (3.2527, -51.2297)
  line L5 (3.2527, -51.2297) -> (3.2527, -61.269)
  line L6 (22.9121, -61.9155) -> (-25.7732, -60.3146) projected
  line L7 (3.2527, -61.269) -> (3.2527, -41.1509)
  line L8 (3.2527, -41.1509) -> (-29.6637, -40.39)
  line L9 (-25.3546, -42.2066) -> (23.523, -43.3366) projected
  line L10 (-29.6637, -40.39) -> (-30.231, -64.9284)
  line L11 (-30.231, -64.9284) -> (3.2527, -61.269)
  point P0 (-25.5, 0)
  point P1 (3.2527, -51.2297)
  dimension "d229" = 20
extrude "Extrusion69" cut sketch "Sketch83" against normal blind 9 contours L7 L5 L11 L10 L8
extrude "Extrusion70" cut sketch "Sketch57" against normal blind 21
sketch "Sketch87" plane through (30.35, 0, -25.5) normal (1, 0, 0) x (0, 0, -1)
  line L0 (0, 0) -> (23.523, -43.3366) projected
  line L1 (23.523, -43.3366) -> (22.3633, -78.6074)
  line L2 (23.523, -43.3366) -> (22.9121, -61.9155) projected
  line L3 (22.3633, -78.6074) -> (29.0342, -79.0987)
  line L4 (29.0342, -79.0987) -> (23.523, -43.3366)
  point P0 (-25.5, 0)
extrude "Extrusion71" cut sketch "Sketch87" against normal blind 6
fillet "Fillet13" radius 15 1 edges at (24.35, -74.85, -56)
fillet "Fillet14" radius 15 2 edges at (-25.65, -74.85, -56) (-34.15, 3, -25.5)
properties part number "DC23[L][F][1]" material "Aluminio 6061"
